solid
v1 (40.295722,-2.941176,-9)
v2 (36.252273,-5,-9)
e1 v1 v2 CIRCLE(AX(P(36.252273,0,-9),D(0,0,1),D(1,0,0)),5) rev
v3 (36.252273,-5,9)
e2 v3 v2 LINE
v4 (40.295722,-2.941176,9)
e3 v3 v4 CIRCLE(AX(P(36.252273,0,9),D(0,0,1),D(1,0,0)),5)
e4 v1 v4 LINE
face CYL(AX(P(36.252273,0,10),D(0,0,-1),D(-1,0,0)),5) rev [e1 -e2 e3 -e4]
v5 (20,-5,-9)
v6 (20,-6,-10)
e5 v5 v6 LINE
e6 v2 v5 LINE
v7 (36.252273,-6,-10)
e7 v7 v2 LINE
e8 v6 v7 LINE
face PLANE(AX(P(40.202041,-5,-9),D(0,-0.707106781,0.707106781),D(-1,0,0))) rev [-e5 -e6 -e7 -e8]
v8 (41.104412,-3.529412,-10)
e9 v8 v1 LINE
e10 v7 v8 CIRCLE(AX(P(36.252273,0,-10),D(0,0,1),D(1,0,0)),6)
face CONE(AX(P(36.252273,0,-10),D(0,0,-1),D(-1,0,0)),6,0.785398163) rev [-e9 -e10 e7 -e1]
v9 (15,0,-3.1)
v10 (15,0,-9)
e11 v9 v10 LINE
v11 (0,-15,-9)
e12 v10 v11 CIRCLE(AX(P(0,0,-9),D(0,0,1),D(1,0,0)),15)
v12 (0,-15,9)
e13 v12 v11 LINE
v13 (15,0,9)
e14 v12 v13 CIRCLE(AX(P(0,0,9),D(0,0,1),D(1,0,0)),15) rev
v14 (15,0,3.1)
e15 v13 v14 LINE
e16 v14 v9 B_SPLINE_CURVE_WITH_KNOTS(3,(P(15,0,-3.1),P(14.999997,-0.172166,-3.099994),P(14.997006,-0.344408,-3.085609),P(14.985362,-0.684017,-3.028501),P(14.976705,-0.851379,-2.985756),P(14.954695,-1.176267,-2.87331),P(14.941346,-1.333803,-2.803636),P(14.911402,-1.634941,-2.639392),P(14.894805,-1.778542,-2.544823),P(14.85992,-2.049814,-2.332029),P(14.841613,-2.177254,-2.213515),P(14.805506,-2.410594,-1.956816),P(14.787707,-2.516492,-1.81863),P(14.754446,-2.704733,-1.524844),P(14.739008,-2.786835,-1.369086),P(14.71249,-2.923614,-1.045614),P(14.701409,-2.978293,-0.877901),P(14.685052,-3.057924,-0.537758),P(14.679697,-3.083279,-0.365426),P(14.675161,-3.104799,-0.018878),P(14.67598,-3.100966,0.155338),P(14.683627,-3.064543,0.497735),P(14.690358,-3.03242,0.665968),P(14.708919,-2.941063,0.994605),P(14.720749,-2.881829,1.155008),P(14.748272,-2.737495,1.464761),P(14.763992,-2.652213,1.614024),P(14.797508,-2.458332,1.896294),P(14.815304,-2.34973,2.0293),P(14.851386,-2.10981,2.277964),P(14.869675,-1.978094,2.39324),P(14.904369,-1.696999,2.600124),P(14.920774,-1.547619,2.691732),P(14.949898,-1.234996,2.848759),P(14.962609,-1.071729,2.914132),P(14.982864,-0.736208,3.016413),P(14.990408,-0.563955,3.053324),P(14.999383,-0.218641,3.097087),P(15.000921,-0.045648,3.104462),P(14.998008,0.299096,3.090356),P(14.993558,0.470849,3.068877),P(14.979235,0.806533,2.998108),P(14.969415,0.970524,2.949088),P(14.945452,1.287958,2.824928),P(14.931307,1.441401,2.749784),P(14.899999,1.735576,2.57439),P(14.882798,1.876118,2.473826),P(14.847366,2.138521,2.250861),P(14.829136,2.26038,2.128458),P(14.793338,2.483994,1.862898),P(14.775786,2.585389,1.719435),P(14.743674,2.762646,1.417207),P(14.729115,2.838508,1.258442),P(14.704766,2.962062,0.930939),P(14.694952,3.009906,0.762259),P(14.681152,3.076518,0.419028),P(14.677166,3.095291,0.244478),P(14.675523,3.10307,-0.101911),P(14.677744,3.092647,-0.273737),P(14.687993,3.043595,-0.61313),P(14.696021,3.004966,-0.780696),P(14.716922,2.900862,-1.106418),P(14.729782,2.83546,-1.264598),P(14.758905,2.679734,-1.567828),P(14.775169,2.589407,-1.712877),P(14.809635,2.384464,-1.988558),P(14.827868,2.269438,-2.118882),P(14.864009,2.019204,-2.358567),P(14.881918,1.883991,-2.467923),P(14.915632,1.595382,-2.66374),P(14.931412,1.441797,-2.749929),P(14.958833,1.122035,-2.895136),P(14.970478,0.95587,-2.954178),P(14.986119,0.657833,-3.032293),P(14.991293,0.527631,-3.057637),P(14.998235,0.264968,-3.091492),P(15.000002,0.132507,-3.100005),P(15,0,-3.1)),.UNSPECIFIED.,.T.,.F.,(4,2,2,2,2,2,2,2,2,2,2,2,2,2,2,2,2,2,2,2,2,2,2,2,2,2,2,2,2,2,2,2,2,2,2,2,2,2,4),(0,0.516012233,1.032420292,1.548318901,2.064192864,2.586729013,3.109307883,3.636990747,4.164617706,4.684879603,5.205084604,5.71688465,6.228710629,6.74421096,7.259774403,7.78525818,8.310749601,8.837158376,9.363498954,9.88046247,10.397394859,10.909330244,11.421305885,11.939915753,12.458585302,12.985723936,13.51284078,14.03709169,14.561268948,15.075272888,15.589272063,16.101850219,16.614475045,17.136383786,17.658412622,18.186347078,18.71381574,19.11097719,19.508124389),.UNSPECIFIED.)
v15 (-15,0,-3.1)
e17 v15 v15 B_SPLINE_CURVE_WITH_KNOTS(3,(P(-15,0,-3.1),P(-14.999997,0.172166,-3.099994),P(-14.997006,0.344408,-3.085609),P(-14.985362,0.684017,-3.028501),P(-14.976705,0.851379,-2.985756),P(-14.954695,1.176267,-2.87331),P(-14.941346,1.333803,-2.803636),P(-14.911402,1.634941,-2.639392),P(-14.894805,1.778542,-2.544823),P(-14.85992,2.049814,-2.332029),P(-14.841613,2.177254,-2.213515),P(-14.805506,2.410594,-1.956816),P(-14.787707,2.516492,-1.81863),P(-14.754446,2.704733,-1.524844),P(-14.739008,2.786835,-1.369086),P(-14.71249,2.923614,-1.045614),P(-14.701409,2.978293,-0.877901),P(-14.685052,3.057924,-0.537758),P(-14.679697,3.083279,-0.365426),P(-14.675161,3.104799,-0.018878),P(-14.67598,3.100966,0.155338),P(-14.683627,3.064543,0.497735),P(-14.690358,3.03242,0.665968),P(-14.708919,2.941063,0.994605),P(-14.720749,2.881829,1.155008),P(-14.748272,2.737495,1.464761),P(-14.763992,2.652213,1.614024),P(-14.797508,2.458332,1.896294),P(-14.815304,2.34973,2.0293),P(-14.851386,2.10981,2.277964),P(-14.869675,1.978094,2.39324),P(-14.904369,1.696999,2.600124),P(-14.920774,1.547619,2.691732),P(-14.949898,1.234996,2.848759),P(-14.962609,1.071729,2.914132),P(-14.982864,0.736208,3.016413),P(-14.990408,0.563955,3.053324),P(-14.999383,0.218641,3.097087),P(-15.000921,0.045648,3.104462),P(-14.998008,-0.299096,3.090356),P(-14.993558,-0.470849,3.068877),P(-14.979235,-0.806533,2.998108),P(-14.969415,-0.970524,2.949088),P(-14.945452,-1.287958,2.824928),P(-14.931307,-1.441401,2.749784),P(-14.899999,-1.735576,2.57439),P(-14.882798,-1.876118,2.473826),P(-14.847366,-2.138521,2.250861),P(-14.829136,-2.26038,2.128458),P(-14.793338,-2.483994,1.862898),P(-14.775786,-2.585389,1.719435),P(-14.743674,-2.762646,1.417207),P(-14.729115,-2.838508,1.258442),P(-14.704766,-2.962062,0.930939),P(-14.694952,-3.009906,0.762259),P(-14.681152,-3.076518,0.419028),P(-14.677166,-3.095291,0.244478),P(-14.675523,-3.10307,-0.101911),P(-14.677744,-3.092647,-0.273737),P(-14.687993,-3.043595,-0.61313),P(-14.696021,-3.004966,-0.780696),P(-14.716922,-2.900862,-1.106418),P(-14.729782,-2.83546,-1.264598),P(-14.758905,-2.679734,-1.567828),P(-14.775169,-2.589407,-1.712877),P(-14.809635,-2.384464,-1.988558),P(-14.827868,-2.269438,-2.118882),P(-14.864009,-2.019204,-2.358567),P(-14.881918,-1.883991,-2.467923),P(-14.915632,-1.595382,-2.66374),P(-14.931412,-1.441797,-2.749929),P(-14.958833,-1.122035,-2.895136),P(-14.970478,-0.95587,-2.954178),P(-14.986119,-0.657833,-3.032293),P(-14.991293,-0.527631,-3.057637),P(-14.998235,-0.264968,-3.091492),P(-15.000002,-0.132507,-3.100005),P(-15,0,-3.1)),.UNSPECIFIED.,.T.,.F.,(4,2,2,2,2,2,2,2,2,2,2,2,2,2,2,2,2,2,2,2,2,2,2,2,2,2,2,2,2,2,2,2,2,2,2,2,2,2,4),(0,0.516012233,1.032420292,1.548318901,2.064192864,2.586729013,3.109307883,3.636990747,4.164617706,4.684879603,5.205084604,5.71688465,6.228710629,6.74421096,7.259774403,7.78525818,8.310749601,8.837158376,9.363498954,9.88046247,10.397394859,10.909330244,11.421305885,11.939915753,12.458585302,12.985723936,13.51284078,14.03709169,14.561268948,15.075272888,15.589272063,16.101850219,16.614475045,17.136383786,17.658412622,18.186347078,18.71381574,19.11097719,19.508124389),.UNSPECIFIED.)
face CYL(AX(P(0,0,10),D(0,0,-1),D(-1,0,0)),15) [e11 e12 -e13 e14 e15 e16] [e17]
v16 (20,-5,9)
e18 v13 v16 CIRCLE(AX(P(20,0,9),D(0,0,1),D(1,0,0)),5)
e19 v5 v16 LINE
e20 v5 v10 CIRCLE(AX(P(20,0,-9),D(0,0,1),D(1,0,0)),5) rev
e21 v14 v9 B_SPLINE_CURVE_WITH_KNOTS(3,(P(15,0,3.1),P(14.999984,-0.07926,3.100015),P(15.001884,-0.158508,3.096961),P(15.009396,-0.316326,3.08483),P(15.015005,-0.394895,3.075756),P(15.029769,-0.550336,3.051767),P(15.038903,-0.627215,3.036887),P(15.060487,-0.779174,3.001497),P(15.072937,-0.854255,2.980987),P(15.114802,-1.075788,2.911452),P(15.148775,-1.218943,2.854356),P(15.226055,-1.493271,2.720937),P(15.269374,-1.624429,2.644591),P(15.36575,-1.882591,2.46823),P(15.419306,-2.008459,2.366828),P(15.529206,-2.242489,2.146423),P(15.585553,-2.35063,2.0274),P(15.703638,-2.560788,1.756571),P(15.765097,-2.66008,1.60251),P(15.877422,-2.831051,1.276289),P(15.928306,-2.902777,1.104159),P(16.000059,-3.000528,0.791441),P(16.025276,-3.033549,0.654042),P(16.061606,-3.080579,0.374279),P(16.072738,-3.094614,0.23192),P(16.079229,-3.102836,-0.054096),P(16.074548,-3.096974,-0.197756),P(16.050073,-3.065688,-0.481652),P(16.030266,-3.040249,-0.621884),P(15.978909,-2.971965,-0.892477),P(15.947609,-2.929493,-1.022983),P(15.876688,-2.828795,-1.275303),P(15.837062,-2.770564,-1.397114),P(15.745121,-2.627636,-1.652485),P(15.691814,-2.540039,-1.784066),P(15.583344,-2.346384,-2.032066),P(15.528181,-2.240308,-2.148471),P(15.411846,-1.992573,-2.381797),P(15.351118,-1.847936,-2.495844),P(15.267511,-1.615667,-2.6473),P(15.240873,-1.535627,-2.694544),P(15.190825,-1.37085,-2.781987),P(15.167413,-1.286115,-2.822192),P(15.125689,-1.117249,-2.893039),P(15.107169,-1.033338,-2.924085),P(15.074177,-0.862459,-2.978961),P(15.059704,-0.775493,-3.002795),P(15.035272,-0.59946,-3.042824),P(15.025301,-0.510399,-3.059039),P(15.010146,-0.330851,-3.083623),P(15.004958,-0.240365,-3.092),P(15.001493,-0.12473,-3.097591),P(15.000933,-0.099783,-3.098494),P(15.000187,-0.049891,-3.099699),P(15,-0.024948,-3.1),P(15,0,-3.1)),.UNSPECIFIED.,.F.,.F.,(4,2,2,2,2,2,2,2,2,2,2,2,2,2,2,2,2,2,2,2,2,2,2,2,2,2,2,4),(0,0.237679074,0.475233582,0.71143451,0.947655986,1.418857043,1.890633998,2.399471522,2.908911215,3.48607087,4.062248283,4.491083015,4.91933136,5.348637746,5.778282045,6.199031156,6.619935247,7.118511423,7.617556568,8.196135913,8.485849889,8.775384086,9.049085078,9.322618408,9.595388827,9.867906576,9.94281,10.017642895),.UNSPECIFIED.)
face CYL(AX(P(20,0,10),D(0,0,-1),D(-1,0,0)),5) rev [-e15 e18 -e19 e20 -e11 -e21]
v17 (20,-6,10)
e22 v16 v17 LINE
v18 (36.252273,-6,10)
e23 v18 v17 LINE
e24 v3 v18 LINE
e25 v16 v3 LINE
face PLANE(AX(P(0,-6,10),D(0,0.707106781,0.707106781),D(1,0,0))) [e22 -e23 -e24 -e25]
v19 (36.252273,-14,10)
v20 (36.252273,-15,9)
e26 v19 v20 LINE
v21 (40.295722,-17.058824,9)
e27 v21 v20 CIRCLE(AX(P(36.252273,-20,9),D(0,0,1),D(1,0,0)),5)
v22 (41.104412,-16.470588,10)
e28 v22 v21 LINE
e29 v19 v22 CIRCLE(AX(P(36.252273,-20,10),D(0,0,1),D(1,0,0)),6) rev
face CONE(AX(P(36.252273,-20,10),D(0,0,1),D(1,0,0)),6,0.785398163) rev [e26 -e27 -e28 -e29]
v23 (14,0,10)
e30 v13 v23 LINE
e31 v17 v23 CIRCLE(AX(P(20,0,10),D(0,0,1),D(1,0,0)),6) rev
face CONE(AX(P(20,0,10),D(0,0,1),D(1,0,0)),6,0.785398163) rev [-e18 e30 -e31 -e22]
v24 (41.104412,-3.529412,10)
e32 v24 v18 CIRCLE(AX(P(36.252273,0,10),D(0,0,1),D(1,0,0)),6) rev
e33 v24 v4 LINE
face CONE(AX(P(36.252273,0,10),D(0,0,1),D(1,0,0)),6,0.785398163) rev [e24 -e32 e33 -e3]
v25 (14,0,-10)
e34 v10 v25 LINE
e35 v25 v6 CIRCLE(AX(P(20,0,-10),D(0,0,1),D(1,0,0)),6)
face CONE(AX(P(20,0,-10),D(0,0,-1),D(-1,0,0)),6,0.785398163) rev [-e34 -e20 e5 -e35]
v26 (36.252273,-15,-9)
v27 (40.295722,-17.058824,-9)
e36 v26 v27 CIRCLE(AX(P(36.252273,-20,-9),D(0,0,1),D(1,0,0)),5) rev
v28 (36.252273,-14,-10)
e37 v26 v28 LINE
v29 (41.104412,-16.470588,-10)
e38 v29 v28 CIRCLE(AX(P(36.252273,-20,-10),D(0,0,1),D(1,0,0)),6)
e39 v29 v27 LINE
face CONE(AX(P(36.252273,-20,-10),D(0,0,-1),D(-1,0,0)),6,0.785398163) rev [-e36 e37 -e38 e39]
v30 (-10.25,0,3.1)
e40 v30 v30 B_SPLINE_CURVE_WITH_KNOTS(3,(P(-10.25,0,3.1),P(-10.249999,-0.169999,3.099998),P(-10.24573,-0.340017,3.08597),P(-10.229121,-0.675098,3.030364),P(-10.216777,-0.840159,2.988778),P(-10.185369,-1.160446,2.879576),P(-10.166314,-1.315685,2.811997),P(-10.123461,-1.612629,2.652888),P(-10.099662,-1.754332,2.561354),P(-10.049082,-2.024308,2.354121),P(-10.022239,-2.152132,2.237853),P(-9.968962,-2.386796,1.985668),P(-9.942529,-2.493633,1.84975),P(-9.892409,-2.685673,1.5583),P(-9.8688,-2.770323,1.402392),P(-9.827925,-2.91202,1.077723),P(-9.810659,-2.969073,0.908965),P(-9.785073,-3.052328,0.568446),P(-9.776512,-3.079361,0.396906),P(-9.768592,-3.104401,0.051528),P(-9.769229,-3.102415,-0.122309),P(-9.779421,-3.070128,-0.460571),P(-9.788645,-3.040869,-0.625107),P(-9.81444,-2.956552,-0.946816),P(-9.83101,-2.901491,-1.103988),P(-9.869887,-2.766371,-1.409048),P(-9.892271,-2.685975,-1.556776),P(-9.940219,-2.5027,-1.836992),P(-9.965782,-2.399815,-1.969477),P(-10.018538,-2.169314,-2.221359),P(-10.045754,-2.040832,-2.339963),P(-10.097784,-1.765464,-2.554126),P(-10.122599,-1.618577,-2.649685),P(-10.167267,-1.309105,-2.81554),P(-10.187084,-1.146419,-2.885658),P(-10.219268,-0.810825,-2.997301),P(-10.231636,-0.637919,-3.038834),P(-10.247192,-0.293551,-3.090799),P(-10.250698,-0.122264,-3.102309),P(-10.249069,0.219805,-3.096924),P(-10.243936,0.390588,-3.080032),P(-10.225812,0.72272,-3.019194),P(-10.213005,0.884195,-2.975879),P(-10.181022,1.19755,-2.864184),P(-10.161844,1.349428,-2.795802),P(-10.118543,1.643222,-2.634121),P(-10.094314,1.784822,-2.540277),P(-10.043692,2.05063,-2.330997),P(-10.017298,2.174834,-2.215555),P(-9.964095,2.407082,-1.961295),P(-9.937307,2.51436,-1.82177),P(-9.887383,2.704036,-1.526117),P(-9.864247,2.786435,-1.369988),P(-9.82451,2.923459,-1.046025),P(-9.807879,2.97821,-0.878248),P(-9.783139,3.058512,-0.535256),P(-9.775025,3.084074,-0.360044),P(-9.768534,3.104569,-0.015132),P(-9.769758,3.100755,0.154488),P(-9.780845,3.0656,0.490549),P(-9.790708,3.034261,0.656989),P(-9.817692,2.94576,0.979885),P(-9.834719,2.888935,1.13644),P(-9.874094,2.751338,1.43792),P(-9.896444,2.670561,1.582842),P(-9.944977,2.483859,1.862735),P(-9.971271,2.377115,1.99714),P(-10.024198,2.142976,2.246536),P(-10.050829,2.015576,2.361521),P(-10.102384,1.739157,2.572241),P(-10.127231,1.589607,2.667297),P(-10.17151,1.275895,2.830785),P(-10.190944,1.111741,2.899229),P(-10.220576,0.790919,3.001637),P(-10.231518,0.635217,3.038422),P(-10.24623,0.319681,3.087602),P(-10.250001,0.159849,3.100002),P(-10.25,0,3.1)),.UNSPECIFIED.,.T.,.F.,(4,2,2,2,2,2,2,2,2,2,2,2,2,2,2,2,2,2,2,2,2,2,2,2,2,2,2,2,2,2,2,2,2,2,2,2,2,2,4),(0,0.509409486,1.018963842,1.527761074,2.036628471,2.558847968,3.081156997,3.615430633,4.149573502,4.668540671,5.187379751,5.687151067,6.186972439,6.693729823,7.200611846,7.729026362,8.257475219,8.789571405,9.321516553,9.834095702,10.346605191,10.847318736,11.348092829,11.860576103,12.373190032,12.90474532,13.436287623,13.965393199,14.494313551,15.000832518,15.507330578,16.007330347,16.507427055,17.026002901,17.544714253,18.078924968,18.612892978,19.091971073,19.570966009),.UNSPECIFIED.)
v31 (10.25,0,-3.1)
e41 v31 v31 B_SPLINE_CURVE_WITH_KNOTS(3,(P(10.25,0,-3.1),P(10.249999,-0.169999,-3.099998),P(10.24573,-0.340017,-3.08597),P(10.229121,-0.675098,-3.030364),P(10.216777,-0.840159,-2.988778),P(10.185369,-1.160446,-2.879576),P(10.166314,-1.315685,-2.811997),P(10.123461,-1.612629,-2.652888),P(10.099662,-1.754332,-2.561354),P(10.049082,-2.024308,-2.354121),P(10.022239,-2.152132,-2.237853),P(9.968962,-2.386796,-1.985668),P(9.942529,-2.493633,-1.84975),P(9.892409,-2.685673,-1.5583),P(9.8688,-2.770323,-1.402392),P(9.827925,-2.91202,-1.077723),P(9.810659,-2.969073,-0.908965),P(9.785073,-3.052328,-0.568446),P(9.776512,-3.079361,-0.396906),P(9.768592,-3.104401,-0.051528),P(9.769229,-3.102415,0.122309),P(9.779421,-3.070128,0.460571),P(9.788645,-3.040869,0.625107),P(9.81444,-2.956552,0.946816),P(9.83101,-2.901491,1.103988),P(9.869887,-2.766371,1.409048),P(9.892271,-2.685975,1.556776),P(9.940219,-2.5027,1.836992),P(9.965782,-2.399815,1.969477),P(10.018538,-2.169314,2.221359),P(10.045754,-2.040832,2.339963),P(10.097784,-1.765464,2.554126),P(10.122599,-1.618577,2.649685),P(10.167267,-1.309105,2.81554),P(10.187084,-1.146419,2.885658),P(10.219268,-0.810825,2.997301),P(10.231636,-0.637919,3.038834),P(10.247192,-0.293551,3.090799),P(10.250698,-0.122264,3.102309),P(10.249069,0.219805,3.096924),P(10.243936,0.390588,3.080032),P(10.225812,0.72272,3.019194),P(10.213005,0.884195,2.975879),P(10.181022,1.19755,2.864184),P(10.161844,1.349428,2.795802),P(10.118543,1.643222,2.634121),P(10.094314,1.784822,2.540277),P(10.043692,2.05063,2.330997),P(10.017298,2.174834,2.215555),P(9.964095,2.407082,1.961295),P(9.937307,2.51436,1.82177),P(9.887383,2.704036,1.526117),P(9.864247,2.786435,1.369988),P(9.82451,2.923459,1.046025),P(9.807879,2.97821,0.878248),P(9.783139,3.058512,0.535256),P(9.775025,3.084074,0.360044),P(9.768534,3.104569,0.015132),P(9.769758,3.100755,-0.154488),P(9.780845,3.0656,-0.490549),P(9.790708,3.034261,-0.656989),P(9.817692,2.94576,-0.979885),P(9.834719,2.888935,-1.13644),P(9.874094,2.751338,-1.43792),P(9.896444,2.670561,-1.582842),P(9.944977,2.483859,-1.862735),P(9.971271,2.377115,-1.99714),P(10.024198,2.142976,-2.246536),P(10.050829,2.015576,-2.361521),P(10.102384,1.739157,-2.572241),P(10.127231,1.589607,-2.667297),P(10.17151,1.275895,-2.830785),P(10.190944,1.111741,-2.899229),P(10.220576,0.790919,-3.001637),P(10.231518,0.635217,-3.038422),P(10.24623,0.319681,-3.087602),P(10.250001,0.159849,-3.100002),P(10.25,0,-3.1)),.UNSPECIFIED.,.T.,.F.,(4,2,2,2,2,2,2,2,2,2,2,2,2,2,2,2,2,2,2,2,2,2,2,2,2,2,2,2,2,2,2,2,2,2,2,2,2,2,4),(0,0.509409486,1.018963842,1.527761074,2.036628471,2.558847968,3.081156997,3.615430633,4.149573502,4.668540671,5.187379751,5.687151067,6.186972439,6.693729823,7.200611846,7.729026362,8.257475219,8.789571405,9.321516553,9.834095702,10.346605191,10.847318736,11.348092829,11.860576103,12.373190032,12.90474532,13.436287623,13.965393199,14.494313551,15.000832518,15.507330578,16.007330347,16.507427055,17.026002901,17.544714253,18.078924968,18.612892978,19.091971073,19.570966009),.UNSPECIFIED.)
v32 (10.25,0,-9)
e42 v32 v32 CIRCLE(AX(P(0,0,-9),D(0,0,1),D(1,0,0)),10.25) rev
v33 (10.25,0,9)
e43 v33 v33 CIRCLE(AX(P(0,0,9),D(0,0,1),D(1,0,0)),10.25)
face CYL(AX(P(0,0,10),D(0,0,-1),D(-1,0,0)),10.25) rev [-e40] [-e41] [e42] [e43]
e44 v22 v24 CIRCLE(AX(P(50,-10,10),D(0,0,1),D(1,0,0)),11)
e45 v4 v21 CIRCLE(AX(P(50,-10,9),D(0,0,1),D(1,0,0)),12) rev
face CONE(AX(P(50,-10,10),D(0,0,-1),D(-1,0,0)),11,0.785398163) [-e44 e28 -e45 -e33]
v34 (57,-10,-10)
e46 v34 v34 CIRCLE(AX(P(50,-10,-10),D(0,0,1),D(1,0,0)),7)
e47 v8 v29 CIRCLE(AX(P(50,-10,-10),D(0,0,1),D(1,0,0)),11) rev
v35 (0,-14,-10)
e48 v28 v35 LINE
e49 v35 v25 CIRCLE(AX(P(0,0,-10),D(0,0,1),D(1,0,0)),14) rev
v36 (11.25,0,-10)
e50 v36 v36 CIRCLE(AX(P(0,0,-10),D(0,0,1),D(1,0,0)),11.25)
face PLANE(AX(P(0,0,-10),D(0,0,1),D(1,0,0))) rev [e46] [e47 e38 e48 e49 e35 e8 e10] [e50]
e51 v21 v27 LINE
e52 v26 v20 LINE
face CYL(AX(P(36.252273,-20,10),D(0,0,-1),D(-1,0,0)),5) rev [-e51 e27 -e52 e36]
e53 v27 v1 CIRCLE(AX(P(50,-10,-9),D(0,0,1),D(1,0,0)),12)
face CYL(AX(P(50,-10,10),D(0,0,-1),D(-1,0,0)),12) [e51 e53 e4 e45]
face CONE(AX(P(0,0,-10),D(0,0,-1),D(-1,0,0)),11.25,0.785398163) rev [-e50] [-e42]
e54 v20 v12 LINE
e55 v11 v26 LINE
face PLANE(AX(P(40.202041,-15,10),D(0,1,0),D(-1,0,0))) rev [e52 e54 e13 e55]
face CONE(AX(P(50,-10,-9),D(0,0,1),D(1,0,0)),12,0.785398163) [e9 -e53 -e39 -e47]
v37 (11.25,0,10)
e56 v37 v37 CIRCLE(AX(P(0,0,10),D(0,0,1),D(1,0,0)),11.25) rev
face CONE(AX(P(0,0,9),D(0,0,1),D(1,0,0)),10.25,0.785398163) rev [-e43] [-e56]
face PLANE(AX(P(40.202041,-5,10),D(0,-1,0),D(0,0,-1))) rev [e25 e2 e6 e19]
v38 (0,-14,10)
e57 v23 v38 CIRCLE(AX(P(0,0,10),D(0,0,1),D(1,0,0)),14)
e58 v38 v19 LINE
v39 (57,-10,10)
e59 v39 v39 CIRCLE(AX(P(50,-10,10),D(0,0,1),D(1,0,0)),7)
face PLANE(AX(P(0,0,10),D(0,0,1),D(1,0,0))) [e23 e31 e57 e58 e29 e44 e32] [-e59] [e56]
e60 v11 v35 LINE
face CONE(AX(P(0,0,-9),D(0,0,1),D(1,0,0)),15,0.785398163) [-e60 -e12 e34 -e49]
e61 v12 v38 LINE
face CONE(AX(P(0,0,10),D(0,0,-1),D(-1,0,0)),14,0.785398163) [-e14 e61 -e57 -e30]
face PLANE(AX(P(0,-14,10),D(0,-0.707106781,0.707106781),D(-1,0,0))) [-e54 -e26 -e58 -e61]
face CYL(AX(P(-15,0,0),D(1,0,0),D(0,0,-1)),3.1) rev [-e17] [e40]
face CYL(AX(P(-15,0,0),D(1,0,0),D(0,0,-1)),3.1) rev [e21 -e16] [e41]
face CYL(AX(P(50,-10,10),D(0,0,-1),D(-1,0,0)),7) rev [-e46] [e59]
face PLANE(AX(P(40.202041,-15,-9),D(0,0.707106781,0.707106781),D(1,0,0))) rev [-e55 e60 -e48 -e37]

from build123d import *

# Parameters (mm, degrees)
SKETCH_1_R               = 15
SKETCH_1_R_2             = 10.25
EXTRUDE_1_DEPTH          = 10
CUT_EXTRUDE_1_DEPTH      = 24.452078799
CUT_EXTRUDE_1_DEPTH_BACK = 24.452078799
SKETCH_2_R               = 3.1
SKETCH_3_R               = 12
SKETCH_3_R_2             = 7
EXTRUDE_2_DEPTH          = 10
EXTRUDE_3_DEPTH          = 10
FILLET_1_R               = 5
CHAMFER_1_SIZE           = 1


with BuildPart() as part:
    # 草图1 → 凸台-拉伸1 (new, symmetric)
    with BuildSketch(Plane.XY):
        Circle(SKETCH_1_R)
        Circle(SKETCH_1_R_2, mode=Mode.SUBTRACT)
    extrude(amount=EXTRUDE_1_DEPTH, both=True)

    # 草图2 → 切除-拉伸1 (cut, two sides: drawn at the far end of the back side and taken through both)
    with BuildSketch(Plane(origin=(0, 0, 0), x_dir=(0, 0, -1), z_dir=(1, 0, 0)).offset(-CUT_EXTRUDE_1_DEPTH_BACK)):
        Circle(SKETCH_2_R)
    extrude(amount=CUT_EXTRUDE_1_DEPTH + CUT_EXTRUDE_1_DEPTH_BACK, mode=Mode.SUBTRACT)



with BuildPart() as body_2:
    # 草图3 → 凸台-拉伸2 (new, symmetric)
    with BuildSketch(Plane.XY):
        with Locations((50, -10)):
            Circle(SKETCH_3_R)
        with Locations((50, -10)):
            Circle(SKETCH_3_R_2, mode=Mode.SUBTRACT)
    extrude(amount=EXTRUDE_2_DEPTH, both=True)


with BuildPart() as part_1:
    add(part.part)

    add(body_2.part)  # 凸台-拉伸3 merges body 2
    # 草图4 → 凸台-拉伸3 (add, symmetric)
    with BuildSketch(Plane.XY):
        with BuildLine():
            Line((40.202041029, -15), (0, -15))
            ThreePointArc((0, -15), (8.660254038, -12.247448714), (14.142135624, -5))
            Line((14.142135624, -5), (40.202041029, -5))
            ThreePointArc((40.202041029, -5), (39, -10), (40.202041029, -15))
        make_face()
    extrude(amount=EXTRUDE_3_DEPTH, both=True)

    # 圆角1
    # the kernel refuses this fillet: 5 mm, written as the material it adds along each edge
    with BuildSketch(Plane(origin=(14.142135624, -5, -10), x_dir=(0.1691019787257651, 0.9855985596534883, 0), z_dir=(0, 0, 1))) as fillet_1_piece_1_section:
        with BuildLine():
            CenterArc((5.918569255, -4.927992798), FILLET_1_R, 99.735610317, 90)
            Line((0.990576457, -5.773502692), (0, 0))
            ThreePointArc((0, 0), (2.536529681, -0.216021605), (5.073059362, 0))
        make_face()
    fillet_1_piece_1 = extrude(amount=20, mode=Mode.PRIVATE)
    fillet_1_piece_1 = fillet_1_piece_1 - Plane(origin=(15.878746953, 0, 0), x_dir=(0, 0, -1), z_dir=(-1, 0, 0)) * Cylinder(3.1, 64, mode=Mode.PRIVATE)
    add(fillet_1_piece_1)
    with BuildSketch(Plane(origin=(39.091287885, -15, -10), x_dir=(0.5049509852949774, -0.8631480188528684, 0), z_dir=(0, 0, 1))) as fillet_1_piece_2:
        with BuildLine():
            CenterArc((2.882176688, -4.975245074), FILLET_1_R, 95.70378036, 53.968120928)
            Line((-1.433563406, -2.450490147), (0, 0))
            ThreePointArc((0, 0), (1.192624836, -0.059411824), (2.385249673, 0))
        make_face()
    extrude(amount=20)
    with BuildSketch(Plane(origin=(39.091287885, -5, -10), x_dir=(-1, 0, 0), z_dir=(0, 0, 1))) as fillet_1_piece_3:
        with BuildLine():
            CenterArc((2.83901497, -5), FILLET_1_R, 90, 53.968120928)
            ThreePointArc((-1.204434172, -2.058823529), (-0.550935888, -1.059411824), (0, 0))
            Line((0, 0), (2.83901497, 0))
        make_face()
    extrude(amount=20)

    # 倒角1
    chamfer_1_edges = [part_1.edges().sort_by_distance(p)[0] for p in [
        (18.126136458, -15, -10),
        (18.126136458, -15, 10),
        (62, -10, -10),
        (-10.25, 0, -10),
        (62, -10, 10),
        (28.126136458, -5, -10),
        (-10.25, 0, 10),
        (28.126136458, -5, 10),
        (-10.606601718, 10.606601718, -10),
        (-10.606601718, 10.606601718, 10),
        (38.520985948, -15.544336057, -10),
        (38.520985948, -15.544336057, 10),
        (38.520985948, -4.455663943, 10),
        (38.520985948, -4.455663943, -10),
        (16.464466094, -3.535533906, -10),
        (16.464466094, -3.535533906, 10),
    ]]
    chamfer(chamfer_1_edges, length=CHAMFER_1_SIZE)


solid = part_1.part
